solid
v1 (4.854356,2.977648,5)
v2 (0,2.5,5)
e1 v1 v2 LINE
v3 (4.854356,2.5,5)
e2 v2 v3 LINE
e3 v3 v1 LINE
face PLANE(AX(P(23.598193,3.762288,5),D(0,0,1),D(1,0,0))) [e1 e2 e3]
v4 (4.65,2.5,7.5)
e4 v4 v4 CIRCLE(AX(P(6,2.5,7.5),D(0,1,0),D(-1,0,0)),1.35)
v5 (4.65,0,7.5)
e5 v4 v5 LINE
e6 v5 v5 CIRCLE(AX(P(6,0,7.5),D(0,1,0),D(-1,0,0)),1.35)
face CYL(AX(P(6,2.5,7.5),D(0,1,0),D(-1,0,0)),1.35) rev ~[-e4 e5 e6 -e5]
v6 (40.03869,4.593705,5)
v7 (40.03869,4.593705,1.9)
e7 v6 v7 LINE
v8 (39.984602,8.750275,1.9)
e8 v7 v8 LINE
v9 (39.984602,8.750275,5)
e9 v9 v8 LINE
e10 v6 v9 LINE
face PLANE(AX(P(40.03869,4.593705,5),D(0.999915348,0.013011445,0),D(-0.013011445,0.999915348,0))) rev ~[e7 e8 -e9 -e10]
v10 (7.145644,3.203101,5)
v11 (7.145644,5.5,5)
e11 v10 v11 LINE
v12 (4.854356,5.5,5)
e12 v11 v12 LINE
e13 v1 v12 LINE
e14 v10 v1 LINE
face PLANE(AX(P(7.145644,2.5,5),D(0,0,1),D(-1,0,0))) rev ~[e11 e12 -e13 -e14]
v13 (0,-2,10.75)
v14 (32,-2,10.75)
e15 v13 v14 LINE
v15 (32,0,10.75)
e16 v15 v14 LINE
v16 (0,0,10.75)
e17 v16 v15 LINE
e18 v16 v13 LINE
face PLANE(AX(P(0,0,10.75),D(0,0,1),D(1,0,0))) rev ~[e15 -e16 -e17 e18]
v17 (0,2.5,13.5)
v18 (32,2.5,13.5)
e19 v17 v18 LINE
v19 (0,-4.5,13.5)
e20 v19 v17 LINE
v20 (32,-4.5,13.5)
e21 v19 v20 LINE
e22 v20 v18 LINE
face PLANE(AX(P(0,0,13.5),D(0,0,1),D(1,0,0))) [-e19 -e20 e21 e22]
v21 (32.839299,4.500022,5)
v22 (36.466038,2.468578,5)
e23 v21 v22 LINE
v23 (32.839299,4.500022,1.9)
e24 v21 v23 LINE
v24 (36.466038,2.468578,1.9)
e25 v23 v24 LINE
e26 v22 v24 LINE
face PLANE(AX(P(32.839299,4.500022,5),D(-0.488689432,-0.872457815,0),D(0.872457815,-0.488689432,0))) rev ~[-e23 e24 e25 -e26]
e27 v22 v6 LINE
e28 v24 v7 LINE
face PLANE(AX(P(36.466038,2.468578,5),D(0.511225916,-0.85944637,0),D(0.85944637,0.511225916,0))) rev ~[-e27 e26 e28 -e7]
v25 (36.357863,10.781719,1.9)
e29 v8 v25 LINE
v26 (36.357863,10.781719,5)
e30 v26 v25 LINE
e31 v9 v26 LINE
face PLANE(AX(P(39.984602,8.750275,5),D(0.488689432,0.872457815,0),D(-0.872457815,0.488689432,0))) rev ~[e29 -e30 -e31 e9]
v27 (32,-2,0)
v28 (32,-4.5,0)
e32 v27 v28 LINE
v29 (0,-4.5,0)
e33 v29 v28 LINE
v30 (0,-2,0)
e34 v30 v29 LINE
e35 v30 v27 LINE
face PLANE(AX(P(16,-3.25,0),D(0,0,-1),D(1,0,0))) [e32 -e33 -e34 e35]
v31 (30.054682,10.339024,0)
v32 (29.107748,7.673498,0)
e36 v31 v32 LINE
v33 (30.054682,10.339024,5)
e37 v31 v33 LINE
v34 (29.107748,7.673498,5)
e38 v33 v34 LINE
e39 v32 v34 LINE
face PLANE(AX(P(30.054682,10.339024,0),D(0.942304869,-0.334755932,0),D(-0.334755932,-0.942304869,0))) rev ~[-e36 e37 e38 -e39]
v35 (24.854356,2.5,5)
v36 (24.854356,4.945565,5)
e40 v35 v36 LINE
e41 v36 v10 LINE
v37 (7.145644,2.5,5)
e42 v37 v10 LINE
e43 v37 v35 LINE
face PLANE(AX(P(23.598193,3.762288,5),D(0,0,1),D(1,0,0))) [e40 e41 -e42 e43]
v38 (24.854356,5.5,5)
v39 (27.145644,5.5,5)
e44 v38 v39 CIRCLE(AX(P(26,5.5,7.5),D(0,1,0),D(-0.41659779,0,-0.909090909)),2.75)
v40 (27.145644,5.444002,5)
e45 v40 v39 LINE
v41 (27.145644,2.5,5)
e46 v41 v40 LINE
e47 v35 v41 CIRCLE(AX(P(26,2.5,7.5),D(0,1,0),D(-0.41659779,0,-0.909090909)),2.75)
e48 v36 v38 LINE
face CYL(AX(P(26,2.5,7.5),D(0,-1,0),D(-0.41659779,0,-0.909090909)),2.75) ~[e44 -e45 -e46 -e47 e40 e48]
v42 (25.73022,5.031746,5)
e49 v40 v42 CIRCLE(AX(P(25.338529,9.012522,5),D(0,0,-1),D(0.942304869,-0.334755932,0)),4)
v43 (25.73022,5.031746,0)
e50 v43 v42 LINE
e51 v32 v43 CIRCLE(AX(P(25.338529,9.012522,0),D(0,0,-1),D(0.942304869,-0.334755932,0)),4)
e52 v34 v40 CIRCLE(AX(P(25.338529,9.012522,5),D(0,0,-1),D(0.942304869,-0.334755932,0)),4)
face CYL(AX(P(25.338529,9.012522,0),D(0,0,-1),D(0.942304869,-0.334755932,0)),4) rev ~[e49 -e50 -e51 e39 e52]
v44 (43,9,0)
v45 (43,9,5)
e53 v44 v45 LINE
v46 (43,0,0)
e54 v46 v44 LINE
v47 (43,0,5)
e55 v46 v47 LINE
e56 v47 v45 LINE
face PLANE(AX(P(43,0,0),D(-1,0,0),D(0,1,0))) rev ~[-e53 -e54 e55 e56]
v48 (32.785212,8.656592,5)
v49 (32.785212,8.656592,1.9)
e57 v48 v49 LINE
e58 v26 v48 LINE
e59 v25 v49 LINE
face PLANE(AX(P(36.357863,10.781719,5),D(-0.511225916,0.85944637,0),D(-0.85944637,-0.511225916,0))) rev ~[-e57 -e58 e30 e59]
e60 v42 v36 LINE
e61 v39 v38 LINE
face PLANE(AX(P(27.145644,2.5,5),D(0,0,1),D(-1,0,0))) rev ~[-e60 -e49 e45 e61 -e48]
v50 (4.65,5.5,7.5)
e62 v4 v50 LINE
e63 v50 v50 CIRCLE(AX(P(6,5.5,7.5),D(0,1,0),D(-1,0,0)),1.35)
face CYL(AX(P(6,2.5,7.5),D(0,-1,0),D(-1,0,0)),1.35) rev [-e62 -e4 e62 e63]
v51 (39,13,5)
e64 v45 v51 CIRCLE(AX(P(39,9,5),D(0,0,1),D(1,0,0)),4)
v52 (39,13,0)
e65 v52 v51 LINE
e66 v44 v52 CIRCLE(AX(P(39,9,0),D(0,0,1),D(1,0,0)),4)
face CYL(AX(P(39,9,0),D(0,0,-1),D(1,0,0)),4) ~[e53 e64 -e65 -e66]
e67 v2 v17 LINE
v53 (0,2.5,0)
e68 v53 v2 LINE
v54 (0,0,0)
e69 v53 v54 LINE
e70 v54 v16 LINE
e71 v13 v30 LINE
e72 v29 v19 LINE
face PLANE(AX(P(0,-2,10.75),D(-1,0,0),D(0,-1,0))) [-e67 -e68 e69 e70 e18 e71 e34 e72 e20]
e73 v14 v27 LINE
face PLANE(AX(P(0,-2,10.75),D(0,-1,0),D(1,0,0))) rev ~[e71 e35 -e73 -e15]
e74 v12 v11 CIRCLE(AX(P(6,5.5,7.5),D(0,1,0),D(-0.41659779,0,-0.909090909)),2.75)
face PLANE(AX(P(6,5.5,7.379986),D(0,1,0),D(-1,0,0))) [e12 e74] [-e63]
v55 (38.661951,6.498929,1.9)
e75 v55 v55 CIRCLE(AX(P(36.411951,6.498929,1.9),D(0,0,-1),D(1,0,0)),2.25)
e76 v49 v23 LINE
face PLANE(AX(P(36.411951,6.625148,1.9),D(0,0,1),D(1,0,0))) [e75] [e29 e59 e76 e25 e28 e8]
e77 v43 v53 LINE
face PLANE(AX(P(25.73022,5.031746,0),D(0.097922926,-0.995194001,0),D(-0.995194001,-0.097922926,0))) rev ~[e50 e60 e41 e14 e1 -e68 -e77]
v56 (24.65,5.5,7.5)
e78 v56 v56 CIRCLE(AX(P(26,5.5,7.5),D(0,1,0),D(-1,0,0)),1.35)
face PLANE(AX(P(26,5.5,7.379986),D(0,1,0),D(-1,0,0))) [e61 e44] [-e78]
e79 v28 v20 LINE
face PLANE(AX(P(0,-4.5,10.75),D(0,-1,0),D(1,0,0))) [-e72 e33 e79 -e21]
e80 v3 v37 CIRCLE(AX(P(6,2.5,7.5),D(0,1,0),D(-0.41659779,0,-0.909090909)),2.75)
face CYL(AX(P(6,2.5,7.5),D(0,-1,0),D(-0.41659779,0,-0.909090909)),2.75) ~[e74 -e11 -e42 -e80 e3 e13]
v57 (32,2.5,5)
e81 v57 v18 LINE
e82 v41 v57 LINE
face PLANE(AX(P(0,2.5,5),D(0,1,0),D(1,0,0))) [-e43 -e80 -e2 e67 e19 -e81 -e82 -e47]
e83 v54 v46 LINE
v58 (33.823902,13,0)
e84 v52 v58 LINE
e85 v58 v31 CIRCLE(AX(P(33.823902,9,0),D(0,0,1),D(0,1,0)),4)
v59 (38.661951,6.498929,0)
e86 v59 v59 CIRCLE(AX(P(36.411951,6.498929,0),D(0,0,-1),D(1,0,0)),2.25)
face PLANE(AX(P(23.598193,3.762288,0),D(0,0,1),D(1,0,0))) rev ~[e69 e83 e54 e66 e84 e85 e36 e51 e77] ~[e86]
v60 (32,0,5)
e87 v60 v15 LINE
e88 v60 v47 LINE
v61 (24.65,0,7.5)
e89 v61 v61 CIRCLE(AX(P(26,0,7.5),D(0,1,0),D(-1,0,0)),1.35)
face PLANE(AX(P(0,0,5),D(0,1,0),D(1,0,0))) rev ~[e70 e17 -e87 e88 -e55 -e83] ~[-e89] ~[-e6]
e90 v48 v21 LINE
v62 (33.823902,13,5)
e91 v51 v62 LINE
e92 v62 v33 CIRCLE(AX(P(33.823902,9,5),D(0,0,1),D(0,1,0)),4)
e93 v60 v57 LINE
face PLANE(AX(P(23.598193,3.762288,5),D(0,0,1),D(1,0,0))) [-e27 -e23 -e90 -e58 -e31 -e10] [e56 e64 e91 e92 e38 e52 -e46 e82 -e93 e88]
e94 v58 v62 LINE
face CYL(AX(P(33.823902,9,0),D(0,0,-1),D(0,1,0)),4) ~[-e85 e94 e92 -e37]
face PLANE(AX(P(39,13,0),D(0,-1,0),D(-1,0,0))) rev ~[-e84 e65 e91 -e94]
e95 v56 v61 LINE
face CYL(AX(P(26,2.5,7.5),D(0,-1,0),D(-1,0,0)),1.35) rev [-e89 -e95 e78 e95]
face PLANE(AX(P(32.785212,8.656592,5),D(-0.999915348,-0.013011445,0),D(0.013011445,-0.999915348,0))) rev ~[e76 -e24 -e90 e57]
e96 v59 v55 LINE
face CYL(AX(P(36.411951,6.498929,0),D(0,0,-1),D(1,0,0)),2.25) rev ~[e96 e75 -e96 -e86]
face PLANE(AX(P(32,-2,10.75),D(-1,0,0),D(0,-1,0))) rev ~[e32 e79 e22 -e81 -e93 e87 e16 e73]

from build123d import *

# Parameters (mm, degrees)
F1_DEPTH  = 5
F3_DEPTH  = 3.1
F4_R      = 2.25
F5_DEPTH  = 5.001
F6_W      = 32
F6_H      = 2.5
F7_DEPTH  = 8.5
F8_W      = 32
F8_H      = 2.75
F9_DEPTH  = 4.5
F10_W     = 32
F10_H     = 2.5
F11_DEPTH = 10.75
F12_R     = 1.35
F13_DEPTH = 3
F14_DEPTH = 2.5


# Not quite as in the source:
# - a feature names something its author has since deleted; it is built from what else it names


with BuildPart() as f1:
    # F0 (on Top) → F1 (new body)
    with BuildSketch(Plane.XY):
        with BuildLine():
            Line((0, 2.5), (0, 0))
            Line((0, 0), (43, 0))
            Line((43, 0), (43, 9))
            ThreePointArc((43, 9), (41.8284271247, 11.8284271247), (39, 13))
            Line((39, 13), (33.8239016482, 13))
            ThreePointArc((33.8239016482, 13), (31.5169659003, 12.2677281794), (30.0546821723, 10.3390237274))
            Line((30.0546821723, 10.3390237274), (29.1077482568, 7.6734983272))
            ThreePointArc((29.1077482568, 7.6734983272), (27.8028764103, 5.8618093159), (25.7302204856, 5.0317460488))
            Line((25.7302204856, 5.0317460488), (0, 2.5))
        make_face()
    extrude(amount=F1_DEPTH)

    # F2 (on face) → F3 (cut)
    with BuildSketch(Plane.XY.offset(5)):
        Polygon((39.9846022951, 8.7502746915), (36.3578632635, 10.7817185123), (32.7852117926, 8.6565922885), (32.8392993532, 4.5000222439), (36.4660383847, 2.4685784231), (40.0386898557, 4.5937046469), align=None)
    extrude(amount=-F3_DEPTH, mode=Mode.SUBTRACT)

    # F4 (on face) → F5 (cut, through all)
    with BuildSketch(Plane(origin=(0, 0, 0), x_dir=(1, 0, 0), z_dir=(0, 0, -1))):
        with Locations((36.4119508241, -6.4989285606)):
            Circle(F4_R)
    extrude(amount=-F5_DEPTH, mode=Mode.SUBTRACT)

    # F6 (on face) → F7 (join)
    with BuildSketch(Plane.XY.offset(5)):
        with Locations((16, 1.25)):
            Rectangle(F6_W, F6_H)
    extrude(amount=F7_DEPTH)

    # F8 (on face) → F9 (join)
    with BuildSketch(Plane.XZ):
        with Locations((16, 12.125)):
            Rectangle(F8_W, F8_H)
    extrude(amount=F9_DEPTH)

    # F10 (on face) → F11 (join)
    with BuildSketch(Plane(origin=(0, 0, 10.75), x_dir=(1, 0, 0), z_dir=(0, 0, -1))):
        with Locations((16, 3.25)):
            Rectangle(F10_W, F10_H)
    extrude(amount=F11_DEPTH)

    # F12 (on face) → F13 (join)
    with BuildSketch(Plane(origin=(0, 2.5, 0), x_dir=(-1, 0, 0), z_dir=(0, 1, 0))):
        with BuildLine():
            Line((-27.1456439237, 5), (-24.8543560763, 5))
            ThreePointArc((-24.8543560763, 5), (-26, 10.25), (-27.1456439237, 5))
        make_face()
        with Locations((-26, 7.5)):
            Circle(F12_R, mode=Mode.SUBTRACT)
        with BuildLine():
            Line((-7.1456439237, 5), (-4.8543560763, 5))
            ThreePointArc((-4.8543560763, 5), (-6, 10.25), (-7.1456439237, 5))
        make_face()
        with Locations((-6, 7.5)):
            Circle(F12_R, mode=Mode.SUBTRACT)
    extrude(amount=F13_DEPTH)

    # F14 (cut, through all): faces of the model
    f14_faces = [f1.faces().sort_by_distance(p)[0] for p in [
        (6, 2.5, 7.5),
        (26, 2.5, 7.5),
    ]]
    extrude(f14_faces, amount=-F14_DEPTH, mode=Mode.SUBTRACT)


solid = f1.part
